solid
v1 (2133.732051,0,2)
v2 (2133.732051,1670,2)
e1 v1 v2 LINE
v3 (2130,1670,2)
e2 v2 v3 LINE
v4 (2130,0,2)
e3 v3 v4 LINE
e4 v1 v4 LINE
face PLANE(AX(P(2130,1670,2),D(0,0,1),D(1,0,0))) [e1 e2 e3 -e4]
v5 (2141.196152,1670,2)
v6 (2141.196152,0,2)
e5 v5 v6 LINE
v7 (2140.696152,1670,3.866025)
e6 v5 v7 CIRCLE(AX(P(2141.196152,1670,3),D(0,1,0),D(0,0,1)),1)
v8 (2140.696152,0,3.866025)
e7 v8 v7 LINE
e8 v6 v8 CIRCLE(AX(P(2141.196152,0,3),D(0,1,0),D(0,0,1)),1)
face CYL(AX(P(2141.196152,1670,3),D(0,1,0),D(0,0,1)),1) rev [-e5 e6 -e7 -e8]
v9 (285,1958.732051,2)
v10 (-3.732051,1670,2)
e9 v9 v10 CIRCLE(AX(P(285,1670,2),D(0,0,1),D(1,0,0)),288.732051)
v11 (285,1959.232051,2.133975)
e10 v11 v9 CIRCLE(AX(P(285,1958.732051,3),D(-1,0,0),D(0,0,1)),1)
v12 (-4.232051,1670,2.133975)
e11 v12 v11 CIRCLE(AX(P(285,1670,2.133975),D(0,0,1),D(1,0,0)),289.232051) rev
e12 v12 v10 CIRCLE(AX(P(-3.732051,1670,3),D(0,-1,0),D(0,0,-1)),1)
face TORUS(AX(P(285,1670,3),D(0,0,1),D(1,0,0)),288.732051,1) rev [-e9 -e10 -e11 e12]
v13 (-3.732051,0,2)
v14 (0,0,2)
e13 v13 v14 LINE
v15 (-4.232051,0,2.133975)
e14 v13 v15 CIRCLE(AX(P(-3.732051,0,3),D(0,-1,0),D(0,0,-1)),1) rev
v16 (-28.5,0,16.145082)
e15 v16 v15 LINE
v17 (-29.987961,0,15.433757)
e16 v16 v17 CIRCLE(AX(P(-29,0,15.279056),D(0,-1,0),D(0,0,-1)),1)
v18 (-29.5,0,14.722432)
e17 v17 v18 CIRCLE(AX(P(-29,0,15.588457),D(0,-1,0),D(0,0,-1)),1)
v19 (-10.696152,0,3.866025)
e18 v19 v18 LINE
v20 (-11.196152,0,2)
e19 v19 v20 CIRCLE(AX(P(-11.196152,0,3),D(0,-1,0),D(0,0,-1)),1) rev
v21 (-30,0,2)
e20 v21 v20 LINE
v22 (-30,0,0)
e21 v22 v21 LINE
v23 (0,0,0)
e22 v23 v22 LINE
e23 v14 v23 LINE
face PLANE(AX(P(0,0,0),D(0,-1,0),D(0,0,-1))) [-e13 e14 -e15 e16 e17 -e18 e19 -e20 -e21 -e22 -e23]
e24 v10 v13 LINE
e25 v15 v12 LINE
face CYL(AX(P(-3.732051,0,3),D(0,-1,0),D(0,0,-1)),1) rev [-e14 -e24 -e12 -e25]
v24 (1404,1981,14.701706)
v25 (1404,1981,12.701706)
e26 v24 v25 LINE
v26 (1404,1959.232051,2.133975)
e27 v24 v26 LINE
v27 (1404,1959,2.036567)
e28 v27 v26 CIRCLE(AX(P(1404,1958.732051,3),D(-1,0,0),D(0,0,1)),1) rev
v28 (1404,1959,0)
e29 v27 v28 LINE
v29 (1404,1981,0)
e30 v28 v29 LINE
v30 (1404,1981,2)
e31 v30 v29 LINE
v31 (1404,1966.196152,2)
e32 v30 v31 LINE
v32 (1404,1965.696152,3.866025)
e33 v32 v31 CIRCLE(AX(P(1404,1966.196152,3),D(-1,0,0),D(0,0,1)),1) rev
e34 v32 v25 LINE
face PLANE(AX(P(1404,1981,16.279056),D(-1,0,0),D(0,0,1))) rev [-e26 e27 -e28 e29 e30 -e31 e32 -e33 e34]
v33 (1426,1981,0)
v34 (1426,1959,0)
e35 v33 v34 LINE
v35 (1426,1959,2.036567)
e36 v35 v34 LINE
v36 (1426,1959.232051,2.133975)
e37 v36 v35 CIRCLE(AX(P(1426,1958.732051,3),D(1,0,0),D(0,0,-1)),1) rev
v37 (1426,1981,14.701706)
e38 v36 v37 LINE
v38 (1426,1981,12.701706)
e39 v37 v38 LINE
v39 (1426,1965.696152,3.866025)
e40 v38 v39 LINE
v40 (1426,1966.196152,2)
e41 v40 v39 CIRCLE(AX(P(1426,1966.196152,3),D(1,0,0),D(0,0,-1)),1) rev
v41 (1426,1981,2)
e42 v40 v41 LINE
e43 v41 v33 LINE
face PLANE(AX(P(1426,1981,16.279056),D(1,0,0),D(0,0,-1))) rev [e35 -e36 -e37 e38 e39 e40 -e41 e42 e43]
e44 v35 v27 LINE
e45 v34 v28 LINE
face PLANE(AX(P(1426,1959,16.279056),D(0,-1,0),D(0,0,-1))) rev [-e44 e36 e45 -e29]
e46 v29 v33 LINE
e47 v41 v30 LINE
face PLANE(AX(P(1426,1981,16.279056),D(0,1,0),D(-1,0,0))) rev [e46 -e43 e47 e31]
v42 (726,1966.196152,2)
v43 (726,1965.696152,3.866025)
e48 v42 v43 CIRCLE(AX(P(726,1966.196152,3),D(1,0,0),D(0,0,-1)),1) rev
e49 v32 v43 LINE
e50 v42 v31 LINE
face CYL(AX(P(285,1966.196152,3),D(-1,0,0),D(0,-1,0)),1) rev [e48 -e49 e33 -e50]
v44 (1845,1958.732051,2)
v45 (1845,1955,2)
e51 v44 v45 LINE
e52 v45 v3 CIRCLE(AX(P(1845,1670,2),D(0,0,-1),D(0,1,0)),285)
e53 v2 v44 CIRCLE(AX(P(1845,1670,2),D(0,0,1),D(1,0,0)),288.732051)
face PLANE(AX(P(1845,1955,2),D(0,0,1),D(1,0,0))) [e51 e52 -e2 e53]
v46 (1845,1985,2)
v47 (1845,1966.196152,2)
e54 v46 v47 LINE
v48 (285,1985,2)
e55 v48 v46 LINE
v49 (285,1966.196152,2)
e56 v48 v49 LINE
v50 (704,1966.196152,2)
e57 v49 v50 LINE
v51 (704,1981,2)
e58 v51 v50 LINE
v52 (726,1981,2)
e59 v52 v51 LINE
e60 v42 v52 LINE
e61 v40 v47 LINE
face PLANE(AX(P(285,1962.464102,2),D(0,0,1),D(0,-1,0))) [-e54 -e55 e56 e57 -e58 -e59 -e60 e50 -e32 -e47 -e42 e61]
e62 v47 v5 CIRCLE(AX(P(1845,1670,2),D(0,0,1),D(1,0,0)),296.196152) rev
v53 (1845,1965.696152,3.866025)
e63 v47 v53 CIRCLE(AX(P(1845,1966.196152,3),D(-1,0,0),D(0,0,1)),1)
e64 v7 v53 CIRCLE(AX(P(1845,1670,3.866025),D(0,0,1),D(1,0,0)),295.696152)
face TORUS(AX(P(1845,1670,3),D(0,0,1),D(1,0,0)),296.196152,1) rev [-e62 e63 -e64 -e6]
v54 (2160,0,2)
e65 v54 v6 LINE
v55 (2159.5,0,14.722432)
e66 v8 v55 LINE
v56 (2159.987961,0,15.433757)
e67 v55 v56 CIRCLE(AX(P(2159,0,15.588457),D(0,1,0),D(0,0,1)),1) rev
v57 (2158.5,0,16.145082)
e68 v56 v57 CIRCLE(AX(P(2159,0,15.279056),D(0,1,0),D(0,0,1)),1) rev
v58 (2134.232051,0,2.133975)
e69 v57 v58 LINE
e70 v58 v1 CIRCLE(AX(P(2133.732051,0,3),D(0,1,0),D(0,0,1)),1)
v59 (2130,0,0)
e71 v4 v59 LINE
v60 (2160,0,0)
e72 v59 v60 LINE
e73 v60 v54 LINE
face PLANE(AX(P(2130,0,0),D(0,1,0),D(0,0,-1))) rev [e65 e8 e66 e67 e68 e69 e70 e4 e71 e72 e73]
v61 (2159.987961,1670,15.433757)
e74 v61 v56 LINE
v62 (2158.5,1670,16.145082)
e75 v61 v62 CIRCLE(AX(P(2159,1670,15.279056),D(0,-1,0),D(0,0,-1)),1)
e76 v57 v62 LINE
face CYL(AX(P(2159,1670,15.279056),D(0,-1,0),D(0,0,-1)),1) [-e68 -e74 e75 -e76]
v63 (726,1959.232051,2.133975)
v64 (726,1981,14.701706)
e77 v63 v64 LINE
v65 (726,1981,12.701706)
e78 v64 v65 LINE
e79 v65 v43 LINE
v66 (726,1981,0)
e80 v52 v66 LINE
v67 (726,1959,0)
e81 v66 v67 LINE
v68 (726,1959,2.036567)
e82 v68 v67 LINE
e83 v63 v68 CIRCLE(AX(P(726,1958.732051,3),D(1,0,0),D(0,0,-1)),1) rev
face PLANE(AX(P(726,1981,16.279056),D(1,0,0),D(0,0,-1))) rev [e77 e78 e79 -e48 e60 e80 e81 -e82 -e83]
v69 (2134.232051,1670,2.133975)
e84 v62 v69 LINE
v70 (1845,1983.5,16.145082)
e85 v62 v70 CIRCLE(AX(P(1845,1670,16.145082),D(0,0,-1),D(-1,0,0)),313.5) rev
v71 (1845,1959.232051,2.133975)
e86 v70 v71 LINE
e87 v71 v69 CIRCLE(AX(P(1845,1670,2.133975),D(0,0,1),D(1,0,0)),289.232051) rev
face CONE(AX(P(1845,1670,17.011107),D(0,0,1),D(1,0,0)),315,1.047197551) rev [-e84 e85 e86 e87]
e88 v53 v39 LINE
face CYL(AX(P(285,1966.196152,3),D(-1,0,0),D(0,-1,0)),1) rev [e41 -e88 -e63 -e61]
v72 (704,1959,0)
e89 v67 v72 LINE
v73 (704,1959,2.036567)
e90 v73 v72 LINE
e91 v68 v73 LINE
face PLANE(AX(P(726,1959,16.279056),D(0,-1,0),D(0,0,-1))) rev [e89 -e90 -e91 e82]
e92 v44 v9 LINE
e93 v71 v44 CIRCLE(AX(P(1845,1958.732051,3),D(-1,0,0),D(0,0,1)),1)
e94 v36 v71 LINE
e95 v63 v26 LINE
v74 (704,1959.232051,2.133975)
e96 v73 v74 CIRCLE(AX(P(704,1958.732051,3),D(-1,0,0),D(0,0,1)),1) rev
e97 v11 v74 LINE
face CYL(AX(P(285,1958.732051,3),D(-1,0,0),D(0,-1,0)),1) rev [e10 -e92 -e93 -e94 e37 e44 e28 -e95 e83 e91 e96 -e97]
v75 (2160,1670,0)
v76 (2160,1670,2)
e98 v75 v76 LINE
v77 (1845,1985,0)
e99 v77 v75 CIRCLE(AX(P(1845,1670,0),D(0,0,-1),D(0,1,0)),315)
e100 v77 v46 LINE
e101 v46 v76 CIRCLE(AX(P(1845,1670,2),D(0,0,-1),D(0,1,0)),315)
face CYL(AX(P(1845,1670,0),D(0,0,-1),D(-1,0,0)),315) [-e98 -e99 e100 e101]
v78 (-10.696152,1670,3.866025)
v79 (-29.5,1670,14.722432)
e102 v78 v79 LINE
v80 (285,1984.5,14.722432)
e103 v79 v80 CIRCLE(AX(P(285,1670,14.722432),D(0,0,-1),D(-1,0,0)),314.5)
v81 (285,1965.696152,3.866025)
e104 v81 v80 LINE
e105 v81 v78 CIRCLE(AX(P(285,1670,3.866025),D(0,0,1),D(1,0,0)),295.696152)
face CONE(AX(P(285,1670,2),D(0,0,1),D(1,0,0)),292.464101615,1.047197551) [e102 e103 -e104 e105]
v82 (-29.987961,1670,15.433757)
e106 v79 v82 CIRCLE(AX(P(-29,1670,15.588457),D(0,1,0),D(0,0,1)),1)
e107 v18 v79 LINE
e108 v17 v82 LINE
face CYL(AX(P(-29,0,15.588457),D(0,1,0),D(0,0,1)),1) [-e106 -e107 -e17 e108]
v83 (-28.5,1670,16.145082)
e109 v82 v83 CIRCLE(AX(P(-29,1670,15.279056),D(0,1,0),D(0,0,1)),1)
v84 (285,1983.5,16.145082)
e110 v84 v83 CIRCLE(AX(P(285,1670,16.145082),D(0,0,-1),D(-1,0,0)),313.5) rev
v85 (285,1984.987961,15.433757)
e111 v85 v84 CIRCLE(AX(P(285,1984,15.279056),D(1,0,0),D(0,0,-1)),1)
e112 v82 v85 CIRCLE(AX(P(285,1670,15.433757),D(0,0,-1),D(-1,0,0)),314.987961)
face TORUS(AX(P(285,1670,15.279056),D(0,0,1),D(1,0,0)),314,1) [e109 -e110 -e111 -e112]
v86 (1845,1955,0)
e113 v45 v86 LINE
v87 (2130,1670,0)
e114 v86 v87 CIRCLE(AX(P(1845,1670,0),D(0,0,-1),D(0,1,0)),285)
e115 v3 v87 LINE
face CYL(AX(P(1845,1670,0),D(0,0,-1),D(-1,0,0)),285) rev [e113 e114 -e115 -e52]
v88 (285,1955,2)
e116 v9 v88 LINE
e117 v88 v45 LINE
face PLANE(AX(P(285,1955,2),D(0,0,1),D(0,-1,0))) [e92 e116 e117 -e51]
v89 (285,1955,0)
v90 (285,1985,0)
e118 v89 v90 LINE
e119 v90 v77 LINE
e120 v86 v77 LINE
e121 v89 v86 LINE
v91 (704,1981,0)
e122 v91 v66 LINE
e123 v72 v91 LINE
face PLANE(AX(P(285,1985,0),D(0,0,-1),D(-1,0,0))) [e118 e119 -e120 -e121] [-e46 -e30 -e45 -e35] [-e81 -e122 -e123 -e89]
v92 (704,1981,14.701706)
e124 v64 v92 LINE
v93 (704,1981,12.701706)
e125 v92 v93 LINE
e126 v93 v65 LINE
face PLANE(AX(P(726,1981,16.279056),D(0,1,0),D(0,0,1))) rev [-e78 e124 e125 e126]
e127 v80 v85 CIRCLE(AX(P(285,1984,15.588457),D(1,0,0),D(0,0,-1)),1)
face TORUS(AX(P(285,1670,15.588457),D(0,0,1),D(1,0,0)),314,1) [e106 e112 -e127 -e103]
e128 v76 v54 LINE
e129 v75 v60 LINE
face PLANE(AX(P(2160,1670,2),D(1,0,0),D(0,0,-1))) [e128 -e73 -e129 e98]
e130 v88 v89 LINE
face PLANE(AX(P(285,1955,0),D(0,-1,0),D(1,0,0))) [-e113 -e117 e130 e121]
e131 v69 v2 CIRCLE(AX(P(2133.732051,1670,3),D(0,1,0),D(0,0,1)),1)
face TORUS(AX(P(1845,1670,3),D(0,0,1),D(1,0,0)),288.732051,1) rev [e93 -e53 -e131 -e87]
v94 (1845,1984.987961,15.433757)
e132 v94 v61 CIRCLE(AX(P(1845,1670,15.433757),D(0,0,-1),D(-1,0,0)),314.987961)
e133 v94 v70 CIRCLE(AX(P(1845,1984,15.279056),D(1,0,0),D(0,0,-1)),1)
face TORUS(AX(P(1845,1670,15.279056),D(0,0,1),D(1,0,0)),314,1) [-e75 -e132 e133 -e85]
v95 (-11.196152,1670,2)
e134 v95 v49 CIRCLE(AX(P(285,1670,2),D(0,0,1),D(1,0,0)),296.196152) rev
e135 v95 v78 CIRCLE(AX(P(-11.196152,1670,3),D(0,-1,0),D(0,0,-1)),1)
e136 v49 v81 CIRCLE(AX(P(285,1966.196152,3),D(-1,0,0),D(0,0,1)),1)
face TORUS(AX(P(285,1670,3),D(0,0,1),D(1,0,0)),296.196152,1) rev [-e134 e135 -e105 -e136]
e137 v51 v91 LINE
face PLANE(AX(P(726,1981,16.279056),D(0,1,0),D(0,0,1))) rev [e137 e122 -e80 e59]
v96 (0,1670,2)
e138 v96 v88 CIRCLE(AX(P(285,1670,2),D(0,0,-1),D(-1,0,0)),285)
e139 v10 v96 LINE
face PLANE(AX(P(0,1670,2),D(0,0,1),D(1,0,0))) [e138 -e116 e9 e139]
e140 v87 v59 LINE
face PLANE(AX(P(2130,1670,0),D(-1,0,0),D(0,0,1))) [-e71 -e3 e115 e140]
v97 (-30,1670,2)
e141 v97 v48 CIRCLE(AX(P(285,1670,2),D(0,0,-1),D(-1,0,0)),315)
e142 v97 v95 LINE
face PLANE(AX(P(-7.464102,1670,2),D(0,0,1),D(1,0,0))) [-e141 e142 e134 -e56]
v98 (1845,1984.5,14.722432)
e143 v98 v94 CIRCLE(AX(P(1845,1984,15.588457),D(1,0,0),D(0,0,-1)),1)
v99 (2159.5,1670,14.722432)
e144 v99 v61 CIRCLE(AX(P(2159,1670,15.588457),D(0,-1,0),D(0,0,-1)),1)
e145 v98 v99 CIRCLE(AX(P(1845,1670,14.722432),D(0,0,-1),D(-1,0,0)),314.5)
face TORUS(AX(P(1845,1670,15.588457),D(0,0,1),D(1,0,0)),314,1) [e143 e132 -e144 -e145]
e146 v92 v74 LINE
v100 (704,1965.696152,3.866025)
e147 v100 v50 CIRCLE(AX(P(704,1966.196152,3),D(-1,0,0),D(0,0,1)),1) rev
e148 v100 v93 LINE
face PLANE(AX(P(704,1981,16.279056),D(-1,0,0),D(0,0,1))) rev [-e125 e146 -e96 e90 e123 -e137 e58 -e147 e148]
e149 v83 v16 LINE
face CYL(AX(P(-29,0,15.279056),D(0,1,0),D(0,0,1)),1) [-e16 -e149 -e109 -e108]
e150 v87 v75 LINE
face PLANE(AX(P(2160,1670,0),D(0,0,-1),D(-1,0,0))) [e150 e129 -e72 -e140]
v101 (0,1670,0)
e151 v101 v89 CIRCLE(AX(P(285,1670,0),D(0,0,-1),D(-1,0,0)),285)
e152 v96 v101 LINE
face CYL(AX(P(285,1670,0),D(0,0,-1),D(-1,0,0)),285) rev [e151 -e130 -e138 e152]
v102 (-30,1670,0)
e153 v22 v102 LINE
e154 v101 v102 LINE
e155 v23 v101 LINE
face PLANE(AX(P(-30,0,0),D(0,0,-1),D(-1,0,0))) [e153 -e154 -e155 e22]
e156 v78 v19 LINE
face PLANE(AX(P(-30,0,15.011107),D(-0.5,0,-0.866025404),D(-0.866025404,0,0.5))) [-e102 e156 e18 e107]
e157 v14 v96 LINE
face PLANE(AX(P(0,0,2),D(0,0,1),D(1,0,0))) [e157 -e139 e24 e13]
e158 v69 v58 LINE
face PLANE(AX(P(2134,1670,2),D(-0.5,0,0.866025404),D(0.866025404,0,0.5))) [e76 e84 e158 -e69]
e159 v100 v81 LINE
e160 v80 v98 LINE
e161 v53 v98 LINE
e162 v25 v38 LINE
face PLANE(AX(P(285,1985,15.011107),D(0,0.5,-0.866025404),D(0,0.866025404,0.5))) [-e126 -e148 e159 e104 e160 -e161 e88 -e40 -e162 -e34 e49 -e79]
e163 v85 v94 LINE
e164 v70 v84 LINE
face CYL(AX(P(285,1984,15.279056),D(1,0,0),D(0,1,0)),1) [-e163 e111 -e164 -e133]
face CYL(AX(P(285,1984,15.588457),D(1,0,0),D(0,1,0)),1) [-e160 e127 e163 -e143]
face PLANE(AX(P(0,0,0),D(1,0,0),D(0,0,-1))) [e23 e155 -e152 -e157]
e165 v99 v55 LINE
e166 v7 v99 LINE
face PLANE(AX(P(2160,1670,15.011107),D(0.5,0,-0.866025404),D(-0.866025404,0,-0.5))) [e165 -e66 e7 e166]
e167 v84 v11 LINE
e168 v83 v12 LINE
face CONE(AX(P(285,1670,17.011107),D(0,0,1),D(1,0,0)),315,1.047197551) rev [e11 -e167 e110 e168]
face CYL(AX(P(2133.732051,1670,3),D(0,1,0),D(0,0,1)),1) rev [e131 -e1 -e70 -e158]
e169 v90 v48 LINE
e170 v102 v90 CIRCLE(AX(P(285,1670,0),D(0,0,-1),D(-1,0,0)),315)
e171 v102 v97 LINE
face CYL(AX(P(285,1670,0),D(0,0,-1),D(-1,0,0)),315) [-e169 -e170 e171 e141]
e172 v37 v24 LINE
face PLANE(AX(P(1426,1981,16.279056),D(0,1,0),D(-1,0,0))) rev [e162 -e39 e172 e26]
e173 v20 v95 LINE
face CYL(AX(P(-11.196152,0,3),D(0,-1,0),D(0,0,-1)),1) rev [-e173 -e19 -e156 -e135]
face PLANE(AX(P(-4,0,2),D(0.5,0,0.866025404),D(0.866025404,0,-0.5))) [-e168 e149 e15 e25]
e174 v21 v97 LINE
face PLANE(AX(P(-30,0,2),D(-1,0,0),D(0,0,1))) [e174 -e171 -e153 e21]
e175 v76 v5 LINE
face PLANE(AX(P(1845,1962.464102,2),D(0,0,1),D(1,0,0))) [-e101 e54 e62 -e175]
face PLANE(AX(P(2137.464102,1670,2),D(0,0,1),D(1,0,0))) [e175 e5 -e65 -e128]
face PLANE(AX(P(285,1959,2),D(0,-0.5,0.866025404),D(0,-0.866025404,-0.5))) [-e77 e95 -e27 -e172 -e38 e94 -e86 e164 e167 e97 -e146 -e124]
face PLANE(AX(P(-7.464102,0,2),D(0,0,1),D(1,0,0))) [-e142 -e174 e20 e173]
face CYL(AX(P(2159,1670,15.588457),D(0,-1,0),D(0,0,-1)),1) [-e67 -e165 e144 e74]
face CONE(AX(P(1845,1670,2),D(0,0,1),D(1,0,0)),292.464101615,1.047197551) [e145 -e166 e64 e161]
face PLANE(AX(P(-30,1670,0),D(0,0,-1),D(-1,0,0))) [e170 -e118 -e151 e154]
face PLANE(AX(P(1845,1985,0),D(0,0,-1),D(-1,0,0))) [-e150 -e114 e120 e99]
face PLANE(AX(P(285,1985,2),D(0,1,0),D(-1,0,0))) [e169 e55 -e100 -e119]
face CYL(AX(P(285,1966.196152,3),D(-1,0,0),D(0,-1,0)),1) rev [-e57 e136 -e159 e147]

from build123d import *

# Parameters (mm, degrees)
FILLET1_R          = 1
SKETCH3_W          = 22
SKETCH3_H          = 22
CUT_EXTRUDE1_DEPTH = 2934.613813656


with BuildPart() as part:
    # Sweep1: sweep along a path in Sketch1
    with BuildLine(Plane.XY) as sweep1_path:
        Line((0, 0), (0, 1670))
        ThreePointArc((0, 1670), (83.474567362, 1871.525432638), (285, 1955))
        Line((285, 1955), (1845, 1955))
        ThreePointArc((1845, 1955), (2046.525432638, 1871.525432638), (2130, 1670))
        Line((2130, 1670), (2130, 0))
    # Sketch2 → Sweep1 (sweep)
    with BuildSketch(Plane(origin=(0, 0, 0), x_dir=(1, 0, 0), z_dir=(0, 1, 0))):
        Polygon((0, 0), (0, -2), (-4, -2), (-30, -17.011106999), (-30, -15.011106999), (-7.464101615, -2), (-30, -2), (-30, 0), align=None)
    sweep(path=sweep1_path.line)

    # Fillet1
    # the kernel refuses this fillet: 1 mm, written as the material it adds along each edge
    with BuildSketch(Plane(origin=(2134, 1670, 2), x_dir=(-1.0, -6.753186657693947e-15, -1.7725502571054264e-12), z_dir=(0, -1, 0))) as fillet1_piece_1:
        with BuildLine():
            CenterArc((FILLET1_R * 0.267949192429, -FILLET1_R), FILLET1_R, 90, 30)
            Line((-FILLET1_R * 0.232050807569, -FILLET1_R * 0.133974596215), (0, 0))
            Line((0, 0), (FILLET1_R * 0.267949192431, 0))
        make_face()
    extrude(amount=1670)
    with BuildSketch(Plane(origin=(1845, 1670, 2), x_dir=(0, 1, 0), z_dir=(-1, 0, 0))) as fillet1_piece_2:
        with BuildLine():
            CenterArc((289 - FILLET1_R * 0.267949192431, -FILLET1_R), FILLET1_R, 60, 30)
            Line((289 + FILLET1_R * 0.232050807569, -FILLET1_R * 0.133974596215), (289, 0))
            Line((289, 0), (289 - FILLET1_R * 0.267949192431, 0))
        make_face()
    revolve(axis=Axis((1845, 1670, 2), (0, 0, -1)), revolution_arc=90)
    with BuildSketch(Plane(origin=(285, 1959, 2), x_dir=(0, -1, 0), z_dir=(1, 0, 0))) as fillet1_piece_3:
        with BuildLine():
            CenterArc((FILLET1_R * 0.267949192431, -FILLET1_R), FILLET1_R, 90, 30)
            Line((-FILLET1_R * 0.232050807569, -FILLET1_R * 0.133974596215), (0, 0))
            Line((0, 0), (FILLET1_R * 0.267949192431, 0))
        make_face()
    extrude(amount=1560)
    with BuildSketch(Plane(origin=(285, 1670, 2), x_dir=(-1, 0, 0), z_dir=(0, -1, 0))) as fillet1_piece_4:
        with BuildLine():
            CenterArc((289 - FILLET1_R * 0.267949192431, -FILLET1_R), FILLET1_R, 60, 30)
            Line((289 + FILLET1_R * 0.232050807569, -FILLET1_R * 0.133974596216), (289, 0))
            Line((289, 0), (289 - FILLET1_R * 0.267949192431, 0))
        make_face()
    revolve(axis=Axis((285, 1670, 2), (0, 0, -1)), revolution_arc=90)
    with BuildSketch(Plane(origin=(2137.464101615, 1670, 2), x_dir=(1, 0, 0), z_dir=(0, -1, 0)), Plane(origin=(-7.464101615, 0, 2), x_dir=(-1, 0, 0), z_dir=(0, 1, 0))) as fillet1_piece_5:
        with BuildLine():
            CenterArc((FILLET1_R * 3.73205080757, FILLET1_R), FILLET1_R, 120, 150)
            Line((FILLET1_R * 3.23205080757, FILLET1_R * 1.86602540378), (0, 0))
            Line((0, 0), (FILLET1_R * 3.73205080757, 0))
        make_face()
    extrude(amount=1670)
    with BuildSketch(Plane(origin=(1845, 1670, 2), x_dir=(0, 1, 0), z_dir=(-1, 0, 0))) as fillet1_piece_6:
        with BuildLine():
            CenterArc((292.464101615 + FILLET1_R * 3.73205080757, -FILLET1_R), FILLET1_R, 90, 150)
            Line((292.464101615 + FILLET1_R * 3.23205080757, -FILLET1_R * 1.86602540378), (292.464101615, 0))
            Line((292.464101615, 0), (292.464101615 + FILLET1_R * 3.73205080757, 0))
        make_face()
    revolve(axis=Axis((1845, 1670, 2), (0, 0, -1)), revolution_arc=90)
    with BuildSketch(Plane(origin=(285, 1962.464101615, 2), x_dir=(0, 1, 0), z_dir=(1, 0, 0))) as fillet1_piece_7:
        with BuildLine():
            CenterArc((FILLET1_R * 3.73205080757, FILLET1_R), FILLET1_R, 120, 150)
            Line((FILLET1_R * 3.23205080757, FILLET1_R * 1.86602540378), (0, 0))
            Line((0, 0), (FILLET1_R * 3.73205080757, 0))
        make_face()
    extrude(amount=1560)
    with BuildSketch(Plane(origin=(285, 1670, 2), x_dir=(-1, 0, 0), z_dir=(0, -1, 0))) as fillet1_piece_8:
        with BuildLine():
            CenterArc((292.464101615 + FILLET1_R * 3.73205080757, -FILLET1_R), FILLET1_R, 90, 150)
            Line((292.464101615 + FILLET1_R * 3.23205080757, -FILLET1_R * 1.86602540378), (292.464101615, 0))
            Line((292.464101615, 0), (292.464101615 + FILLET1_R * 3.73205080757, 0))
        make_face()
    revolve(axis=Axis((285, 1670, 2), (0, 0, -1)), revolution_arc=90)
    with BuildSketch(Plane(origin=(-4, 0, 2), x_dir=(-0.8660254037844416, 0, 0.499999999999995), z_dir=(0, 1, 0))) as fillet1_piece_9:
        with BuildLine():
            CenterArc((FILLET1_R * 0.267949192431, FILLET1_R), FILLET1_R, 240, 30)
            Line((-FILLET1_R * 0.232050807569, FILLET1_R * 0.133974596216), (0, 0))
            Line((0, 0), (FILLET1_R * 0.267949192431, 0))
        make_face()
    extrude(amount=1670)
    # the kernel refuses this fillet: 1 mm, written as the material it takes off along each edge
    with BuildSketch(Plane(origin=(2160, 1670, 15.011106999), x_dir=(-0.8660254037844758, -7.797908269406777e-15, -0.49999999999993566), z_dir=(0, -1, 0)), Plane(origin=(-30, -1.443375673, 15.011106999), x_dir=(0.8660254037844414, 0, -0.4999999999999953), z_dir=(0, 1, 0))) as fillet1_2_piece_1:
        with BuildLine():
            CenterArc((FILLET1_R * 0.57735026919, -FILLET1_R), FILLET1_R, 90, 60)
            Line((-FILLET1_R * 0.288675134595, -FILLET1_R * 0.5), (0, 0))
            Line((0, 0), (FILLET1_R * 0.57735026919, 0))
        make_face()
    extrude(amount=1671.443375673, mode=Mode.SUBTRACT)
    with BuildSketch(Plane(origin=(1845, 1670, 15.011106999), x_dir=(0, 1, 0), z_dir=(-1, 0, 0))) as fillet1_2_piece_2:
        with BuildLine():
            CenterArc((315 - FILLET1_R, -FILLET1_R * 0.57735026919), FILLET1_R, 0, 60)
            Line((315 - FILLET1_R * 0.5, FILLET1_R * 0.288675134595), (315, 0))
            Line((315, 0), (315, -FILLET1_R * 0.57735026919))
        make_face()
    revolve(axis=Axis((1845, 1670, 15.011106999), (0, 0, -1)), revolution_arc=90, mode=Mode.SUBTRACT)
    with BuildSketch(Plane(origin=(285, 1985, 15.011106999), x_dir=(0, 0, 1), z_dir=(1, 0, 0))) as fillet1_2_piece_3:
        with BuildLine():
            CenterArc((FILLET1_R * 0.57735026919, FILLET1_R), FILLET1_R, 210, 60)
            Line((-FILLET1_R * 0.288675134595, FILLET1_R * 0.5), (0, 0))
            Line((0, 0), (FILLET1_R * 0.57735026919, 0))
        make_face()
    extrude(amount=1560, mode=Mode.SUBTRACT)
    with BuildSketch(Plane(origin=(285, 1670, 15.011106999), x_dir=(-1, 0, 0), z_dir=(0, -1, 0))) as fillet1_2_piece_4:
        with BuildLine():
            CenterArc((315 - FILLET1_R, -FILLET1_R * 0.57735026919), FILLET1_R, 0, 60)
            Line((315, -FILLET1_R * 0.57735026919), (315, 0))
            Line((315, 0), (315 - FILLET1_R * 0.5, FILLET1_R * 0.288675134595))
        make_face()
    revolve(axis=Axis((285, 1670, 15.011106999), (0, 0, -1)), revolution_arc=90, mode=Mode.SUBTRACT)
    with BuildSketch(Plane(origin=(2160, 1670, 17.011106999), x_dir=(-0.8660254037844523, 0, -0.4999999999999764), z_dir=(0, -1, 0))) as fillet1_2_piece_5:
        with BuildLine():
            CenterArc((FILLET1_R * 1.73205080757, FILLET1_R), FILLET1_R, 150, 120)
            Line((FILLET1_R * 0.866025403784, FILLET1_R * 1.5), (0, 0))
            Line((0, 0), (FILLET1_R * 1.73205080757, 0))
        make_face()
    extrude(amount=1674.330127019, mode=Mode.SUBTRACT)
    with BuildSketch(Plane(origin=(1845, 1670, 17.011106999), x_dir=(0, 1, 0), z_dir=(-1, 0, 0))) as fillet1_2_piece_6:
        with BuildLine():
            CenterArc((315 - FILLET1_R, FILLET1_R * 1.73205080757), FILLET1_R, 240, 120)
            Line((315, FILLET1_R * 1.73205080757), (315, 0))
            Line((315, 0), (315 - FILLET1_R * 1.5, FILLET1_R * 0.866025403784))
        make_face()
    revolve(axis=Axis((1845, 1670, 17.011106999), (0, 0, -1)), revolution_arc=90, mode=Mode.SUBTRACT)
    with BuildSketch(Plane(origin=(285, 1985, 17.011106999), x_dir=(0, -0.8660254037844523, -0.4999999999999764), z_dir=(1, 0, 0))) as fillet1_2_piece_7:
        with BuildLine():
            CenterArc((FILLET1_R * 1.73205080757, FILLET1_R), FILLET1_R, 150, 120)
            Line((FILLET1_R * 0.866025403784, FILLET1_R * 1.5), (0, 0))
            Line((0, 0), (FILLET1_R * 1.73205080757, 0))
        make_face()
    extrude(amount=1560, mode=Mode.SUBTRACT)
    with BuildSketch(Plane(origin=(285, 1670, 17.011106999), x_dir=(-1, 0, 0), z_dir=(0, -1, 0))) as fillet1_2_piece_8:
        with BuildLine():
            CenterArc((315 - FILLET1_R, FILLET1_R * 1.73205080757), FILLET1_R, 240, 120)
            Line((315, FILLET1_R * 1.73205080757), (315, 0))
            Line((315, 0), (315 - FILLET1_R * 1.5, FILLET1_R * 0.866025403784))
        make_face()
    revolve(axis=Axis((285, 1670, 17.011106999), (0, 0, -1)), revolution_arc=90, mode=Mode.SUBTRACT)
    with BuildSketch(Plane(origin=(-30, -4.330127019, 17.011106999), x_dir=(0, 0, -1), z_dir=(0, 1, 0))) as fillet1_2_piece_9:
        with BuildLine():
            CenterArc((FILLET1_R * 1.73205080757, -FILLET1_R), FILLET1_R, 90, 120)
            Line((FILLET1_R * 0.866025403784, -FILLET1_R * 1.5), (0, 0))
            Line((0, 0), (FILLET1_R * 1.73205080757, 0))
        make_face()
    extrude(amount=1674.330127019, mode=Mode.SUBTRACT)

    # Sketch3 → Cut-Extrude1 (cut, through all)
    with BuildSketch(Plane(origin=(0, 0, 0), x_dir=(-1, 0, 0), z_dir=(0, 0, -1))):
        with Locations((-1415, 1970)):
            Rectangle(SKETCH3_W, SKETCH3_H)
        with Locations((-715, 1970)):
            Rectangle(SKETCH3_W, SKETCH3_H)
    extrude(amount=-CUT_EXTRUDE1_DEPTH, mode=Mode.SUBTRACT)


solid = part.part
